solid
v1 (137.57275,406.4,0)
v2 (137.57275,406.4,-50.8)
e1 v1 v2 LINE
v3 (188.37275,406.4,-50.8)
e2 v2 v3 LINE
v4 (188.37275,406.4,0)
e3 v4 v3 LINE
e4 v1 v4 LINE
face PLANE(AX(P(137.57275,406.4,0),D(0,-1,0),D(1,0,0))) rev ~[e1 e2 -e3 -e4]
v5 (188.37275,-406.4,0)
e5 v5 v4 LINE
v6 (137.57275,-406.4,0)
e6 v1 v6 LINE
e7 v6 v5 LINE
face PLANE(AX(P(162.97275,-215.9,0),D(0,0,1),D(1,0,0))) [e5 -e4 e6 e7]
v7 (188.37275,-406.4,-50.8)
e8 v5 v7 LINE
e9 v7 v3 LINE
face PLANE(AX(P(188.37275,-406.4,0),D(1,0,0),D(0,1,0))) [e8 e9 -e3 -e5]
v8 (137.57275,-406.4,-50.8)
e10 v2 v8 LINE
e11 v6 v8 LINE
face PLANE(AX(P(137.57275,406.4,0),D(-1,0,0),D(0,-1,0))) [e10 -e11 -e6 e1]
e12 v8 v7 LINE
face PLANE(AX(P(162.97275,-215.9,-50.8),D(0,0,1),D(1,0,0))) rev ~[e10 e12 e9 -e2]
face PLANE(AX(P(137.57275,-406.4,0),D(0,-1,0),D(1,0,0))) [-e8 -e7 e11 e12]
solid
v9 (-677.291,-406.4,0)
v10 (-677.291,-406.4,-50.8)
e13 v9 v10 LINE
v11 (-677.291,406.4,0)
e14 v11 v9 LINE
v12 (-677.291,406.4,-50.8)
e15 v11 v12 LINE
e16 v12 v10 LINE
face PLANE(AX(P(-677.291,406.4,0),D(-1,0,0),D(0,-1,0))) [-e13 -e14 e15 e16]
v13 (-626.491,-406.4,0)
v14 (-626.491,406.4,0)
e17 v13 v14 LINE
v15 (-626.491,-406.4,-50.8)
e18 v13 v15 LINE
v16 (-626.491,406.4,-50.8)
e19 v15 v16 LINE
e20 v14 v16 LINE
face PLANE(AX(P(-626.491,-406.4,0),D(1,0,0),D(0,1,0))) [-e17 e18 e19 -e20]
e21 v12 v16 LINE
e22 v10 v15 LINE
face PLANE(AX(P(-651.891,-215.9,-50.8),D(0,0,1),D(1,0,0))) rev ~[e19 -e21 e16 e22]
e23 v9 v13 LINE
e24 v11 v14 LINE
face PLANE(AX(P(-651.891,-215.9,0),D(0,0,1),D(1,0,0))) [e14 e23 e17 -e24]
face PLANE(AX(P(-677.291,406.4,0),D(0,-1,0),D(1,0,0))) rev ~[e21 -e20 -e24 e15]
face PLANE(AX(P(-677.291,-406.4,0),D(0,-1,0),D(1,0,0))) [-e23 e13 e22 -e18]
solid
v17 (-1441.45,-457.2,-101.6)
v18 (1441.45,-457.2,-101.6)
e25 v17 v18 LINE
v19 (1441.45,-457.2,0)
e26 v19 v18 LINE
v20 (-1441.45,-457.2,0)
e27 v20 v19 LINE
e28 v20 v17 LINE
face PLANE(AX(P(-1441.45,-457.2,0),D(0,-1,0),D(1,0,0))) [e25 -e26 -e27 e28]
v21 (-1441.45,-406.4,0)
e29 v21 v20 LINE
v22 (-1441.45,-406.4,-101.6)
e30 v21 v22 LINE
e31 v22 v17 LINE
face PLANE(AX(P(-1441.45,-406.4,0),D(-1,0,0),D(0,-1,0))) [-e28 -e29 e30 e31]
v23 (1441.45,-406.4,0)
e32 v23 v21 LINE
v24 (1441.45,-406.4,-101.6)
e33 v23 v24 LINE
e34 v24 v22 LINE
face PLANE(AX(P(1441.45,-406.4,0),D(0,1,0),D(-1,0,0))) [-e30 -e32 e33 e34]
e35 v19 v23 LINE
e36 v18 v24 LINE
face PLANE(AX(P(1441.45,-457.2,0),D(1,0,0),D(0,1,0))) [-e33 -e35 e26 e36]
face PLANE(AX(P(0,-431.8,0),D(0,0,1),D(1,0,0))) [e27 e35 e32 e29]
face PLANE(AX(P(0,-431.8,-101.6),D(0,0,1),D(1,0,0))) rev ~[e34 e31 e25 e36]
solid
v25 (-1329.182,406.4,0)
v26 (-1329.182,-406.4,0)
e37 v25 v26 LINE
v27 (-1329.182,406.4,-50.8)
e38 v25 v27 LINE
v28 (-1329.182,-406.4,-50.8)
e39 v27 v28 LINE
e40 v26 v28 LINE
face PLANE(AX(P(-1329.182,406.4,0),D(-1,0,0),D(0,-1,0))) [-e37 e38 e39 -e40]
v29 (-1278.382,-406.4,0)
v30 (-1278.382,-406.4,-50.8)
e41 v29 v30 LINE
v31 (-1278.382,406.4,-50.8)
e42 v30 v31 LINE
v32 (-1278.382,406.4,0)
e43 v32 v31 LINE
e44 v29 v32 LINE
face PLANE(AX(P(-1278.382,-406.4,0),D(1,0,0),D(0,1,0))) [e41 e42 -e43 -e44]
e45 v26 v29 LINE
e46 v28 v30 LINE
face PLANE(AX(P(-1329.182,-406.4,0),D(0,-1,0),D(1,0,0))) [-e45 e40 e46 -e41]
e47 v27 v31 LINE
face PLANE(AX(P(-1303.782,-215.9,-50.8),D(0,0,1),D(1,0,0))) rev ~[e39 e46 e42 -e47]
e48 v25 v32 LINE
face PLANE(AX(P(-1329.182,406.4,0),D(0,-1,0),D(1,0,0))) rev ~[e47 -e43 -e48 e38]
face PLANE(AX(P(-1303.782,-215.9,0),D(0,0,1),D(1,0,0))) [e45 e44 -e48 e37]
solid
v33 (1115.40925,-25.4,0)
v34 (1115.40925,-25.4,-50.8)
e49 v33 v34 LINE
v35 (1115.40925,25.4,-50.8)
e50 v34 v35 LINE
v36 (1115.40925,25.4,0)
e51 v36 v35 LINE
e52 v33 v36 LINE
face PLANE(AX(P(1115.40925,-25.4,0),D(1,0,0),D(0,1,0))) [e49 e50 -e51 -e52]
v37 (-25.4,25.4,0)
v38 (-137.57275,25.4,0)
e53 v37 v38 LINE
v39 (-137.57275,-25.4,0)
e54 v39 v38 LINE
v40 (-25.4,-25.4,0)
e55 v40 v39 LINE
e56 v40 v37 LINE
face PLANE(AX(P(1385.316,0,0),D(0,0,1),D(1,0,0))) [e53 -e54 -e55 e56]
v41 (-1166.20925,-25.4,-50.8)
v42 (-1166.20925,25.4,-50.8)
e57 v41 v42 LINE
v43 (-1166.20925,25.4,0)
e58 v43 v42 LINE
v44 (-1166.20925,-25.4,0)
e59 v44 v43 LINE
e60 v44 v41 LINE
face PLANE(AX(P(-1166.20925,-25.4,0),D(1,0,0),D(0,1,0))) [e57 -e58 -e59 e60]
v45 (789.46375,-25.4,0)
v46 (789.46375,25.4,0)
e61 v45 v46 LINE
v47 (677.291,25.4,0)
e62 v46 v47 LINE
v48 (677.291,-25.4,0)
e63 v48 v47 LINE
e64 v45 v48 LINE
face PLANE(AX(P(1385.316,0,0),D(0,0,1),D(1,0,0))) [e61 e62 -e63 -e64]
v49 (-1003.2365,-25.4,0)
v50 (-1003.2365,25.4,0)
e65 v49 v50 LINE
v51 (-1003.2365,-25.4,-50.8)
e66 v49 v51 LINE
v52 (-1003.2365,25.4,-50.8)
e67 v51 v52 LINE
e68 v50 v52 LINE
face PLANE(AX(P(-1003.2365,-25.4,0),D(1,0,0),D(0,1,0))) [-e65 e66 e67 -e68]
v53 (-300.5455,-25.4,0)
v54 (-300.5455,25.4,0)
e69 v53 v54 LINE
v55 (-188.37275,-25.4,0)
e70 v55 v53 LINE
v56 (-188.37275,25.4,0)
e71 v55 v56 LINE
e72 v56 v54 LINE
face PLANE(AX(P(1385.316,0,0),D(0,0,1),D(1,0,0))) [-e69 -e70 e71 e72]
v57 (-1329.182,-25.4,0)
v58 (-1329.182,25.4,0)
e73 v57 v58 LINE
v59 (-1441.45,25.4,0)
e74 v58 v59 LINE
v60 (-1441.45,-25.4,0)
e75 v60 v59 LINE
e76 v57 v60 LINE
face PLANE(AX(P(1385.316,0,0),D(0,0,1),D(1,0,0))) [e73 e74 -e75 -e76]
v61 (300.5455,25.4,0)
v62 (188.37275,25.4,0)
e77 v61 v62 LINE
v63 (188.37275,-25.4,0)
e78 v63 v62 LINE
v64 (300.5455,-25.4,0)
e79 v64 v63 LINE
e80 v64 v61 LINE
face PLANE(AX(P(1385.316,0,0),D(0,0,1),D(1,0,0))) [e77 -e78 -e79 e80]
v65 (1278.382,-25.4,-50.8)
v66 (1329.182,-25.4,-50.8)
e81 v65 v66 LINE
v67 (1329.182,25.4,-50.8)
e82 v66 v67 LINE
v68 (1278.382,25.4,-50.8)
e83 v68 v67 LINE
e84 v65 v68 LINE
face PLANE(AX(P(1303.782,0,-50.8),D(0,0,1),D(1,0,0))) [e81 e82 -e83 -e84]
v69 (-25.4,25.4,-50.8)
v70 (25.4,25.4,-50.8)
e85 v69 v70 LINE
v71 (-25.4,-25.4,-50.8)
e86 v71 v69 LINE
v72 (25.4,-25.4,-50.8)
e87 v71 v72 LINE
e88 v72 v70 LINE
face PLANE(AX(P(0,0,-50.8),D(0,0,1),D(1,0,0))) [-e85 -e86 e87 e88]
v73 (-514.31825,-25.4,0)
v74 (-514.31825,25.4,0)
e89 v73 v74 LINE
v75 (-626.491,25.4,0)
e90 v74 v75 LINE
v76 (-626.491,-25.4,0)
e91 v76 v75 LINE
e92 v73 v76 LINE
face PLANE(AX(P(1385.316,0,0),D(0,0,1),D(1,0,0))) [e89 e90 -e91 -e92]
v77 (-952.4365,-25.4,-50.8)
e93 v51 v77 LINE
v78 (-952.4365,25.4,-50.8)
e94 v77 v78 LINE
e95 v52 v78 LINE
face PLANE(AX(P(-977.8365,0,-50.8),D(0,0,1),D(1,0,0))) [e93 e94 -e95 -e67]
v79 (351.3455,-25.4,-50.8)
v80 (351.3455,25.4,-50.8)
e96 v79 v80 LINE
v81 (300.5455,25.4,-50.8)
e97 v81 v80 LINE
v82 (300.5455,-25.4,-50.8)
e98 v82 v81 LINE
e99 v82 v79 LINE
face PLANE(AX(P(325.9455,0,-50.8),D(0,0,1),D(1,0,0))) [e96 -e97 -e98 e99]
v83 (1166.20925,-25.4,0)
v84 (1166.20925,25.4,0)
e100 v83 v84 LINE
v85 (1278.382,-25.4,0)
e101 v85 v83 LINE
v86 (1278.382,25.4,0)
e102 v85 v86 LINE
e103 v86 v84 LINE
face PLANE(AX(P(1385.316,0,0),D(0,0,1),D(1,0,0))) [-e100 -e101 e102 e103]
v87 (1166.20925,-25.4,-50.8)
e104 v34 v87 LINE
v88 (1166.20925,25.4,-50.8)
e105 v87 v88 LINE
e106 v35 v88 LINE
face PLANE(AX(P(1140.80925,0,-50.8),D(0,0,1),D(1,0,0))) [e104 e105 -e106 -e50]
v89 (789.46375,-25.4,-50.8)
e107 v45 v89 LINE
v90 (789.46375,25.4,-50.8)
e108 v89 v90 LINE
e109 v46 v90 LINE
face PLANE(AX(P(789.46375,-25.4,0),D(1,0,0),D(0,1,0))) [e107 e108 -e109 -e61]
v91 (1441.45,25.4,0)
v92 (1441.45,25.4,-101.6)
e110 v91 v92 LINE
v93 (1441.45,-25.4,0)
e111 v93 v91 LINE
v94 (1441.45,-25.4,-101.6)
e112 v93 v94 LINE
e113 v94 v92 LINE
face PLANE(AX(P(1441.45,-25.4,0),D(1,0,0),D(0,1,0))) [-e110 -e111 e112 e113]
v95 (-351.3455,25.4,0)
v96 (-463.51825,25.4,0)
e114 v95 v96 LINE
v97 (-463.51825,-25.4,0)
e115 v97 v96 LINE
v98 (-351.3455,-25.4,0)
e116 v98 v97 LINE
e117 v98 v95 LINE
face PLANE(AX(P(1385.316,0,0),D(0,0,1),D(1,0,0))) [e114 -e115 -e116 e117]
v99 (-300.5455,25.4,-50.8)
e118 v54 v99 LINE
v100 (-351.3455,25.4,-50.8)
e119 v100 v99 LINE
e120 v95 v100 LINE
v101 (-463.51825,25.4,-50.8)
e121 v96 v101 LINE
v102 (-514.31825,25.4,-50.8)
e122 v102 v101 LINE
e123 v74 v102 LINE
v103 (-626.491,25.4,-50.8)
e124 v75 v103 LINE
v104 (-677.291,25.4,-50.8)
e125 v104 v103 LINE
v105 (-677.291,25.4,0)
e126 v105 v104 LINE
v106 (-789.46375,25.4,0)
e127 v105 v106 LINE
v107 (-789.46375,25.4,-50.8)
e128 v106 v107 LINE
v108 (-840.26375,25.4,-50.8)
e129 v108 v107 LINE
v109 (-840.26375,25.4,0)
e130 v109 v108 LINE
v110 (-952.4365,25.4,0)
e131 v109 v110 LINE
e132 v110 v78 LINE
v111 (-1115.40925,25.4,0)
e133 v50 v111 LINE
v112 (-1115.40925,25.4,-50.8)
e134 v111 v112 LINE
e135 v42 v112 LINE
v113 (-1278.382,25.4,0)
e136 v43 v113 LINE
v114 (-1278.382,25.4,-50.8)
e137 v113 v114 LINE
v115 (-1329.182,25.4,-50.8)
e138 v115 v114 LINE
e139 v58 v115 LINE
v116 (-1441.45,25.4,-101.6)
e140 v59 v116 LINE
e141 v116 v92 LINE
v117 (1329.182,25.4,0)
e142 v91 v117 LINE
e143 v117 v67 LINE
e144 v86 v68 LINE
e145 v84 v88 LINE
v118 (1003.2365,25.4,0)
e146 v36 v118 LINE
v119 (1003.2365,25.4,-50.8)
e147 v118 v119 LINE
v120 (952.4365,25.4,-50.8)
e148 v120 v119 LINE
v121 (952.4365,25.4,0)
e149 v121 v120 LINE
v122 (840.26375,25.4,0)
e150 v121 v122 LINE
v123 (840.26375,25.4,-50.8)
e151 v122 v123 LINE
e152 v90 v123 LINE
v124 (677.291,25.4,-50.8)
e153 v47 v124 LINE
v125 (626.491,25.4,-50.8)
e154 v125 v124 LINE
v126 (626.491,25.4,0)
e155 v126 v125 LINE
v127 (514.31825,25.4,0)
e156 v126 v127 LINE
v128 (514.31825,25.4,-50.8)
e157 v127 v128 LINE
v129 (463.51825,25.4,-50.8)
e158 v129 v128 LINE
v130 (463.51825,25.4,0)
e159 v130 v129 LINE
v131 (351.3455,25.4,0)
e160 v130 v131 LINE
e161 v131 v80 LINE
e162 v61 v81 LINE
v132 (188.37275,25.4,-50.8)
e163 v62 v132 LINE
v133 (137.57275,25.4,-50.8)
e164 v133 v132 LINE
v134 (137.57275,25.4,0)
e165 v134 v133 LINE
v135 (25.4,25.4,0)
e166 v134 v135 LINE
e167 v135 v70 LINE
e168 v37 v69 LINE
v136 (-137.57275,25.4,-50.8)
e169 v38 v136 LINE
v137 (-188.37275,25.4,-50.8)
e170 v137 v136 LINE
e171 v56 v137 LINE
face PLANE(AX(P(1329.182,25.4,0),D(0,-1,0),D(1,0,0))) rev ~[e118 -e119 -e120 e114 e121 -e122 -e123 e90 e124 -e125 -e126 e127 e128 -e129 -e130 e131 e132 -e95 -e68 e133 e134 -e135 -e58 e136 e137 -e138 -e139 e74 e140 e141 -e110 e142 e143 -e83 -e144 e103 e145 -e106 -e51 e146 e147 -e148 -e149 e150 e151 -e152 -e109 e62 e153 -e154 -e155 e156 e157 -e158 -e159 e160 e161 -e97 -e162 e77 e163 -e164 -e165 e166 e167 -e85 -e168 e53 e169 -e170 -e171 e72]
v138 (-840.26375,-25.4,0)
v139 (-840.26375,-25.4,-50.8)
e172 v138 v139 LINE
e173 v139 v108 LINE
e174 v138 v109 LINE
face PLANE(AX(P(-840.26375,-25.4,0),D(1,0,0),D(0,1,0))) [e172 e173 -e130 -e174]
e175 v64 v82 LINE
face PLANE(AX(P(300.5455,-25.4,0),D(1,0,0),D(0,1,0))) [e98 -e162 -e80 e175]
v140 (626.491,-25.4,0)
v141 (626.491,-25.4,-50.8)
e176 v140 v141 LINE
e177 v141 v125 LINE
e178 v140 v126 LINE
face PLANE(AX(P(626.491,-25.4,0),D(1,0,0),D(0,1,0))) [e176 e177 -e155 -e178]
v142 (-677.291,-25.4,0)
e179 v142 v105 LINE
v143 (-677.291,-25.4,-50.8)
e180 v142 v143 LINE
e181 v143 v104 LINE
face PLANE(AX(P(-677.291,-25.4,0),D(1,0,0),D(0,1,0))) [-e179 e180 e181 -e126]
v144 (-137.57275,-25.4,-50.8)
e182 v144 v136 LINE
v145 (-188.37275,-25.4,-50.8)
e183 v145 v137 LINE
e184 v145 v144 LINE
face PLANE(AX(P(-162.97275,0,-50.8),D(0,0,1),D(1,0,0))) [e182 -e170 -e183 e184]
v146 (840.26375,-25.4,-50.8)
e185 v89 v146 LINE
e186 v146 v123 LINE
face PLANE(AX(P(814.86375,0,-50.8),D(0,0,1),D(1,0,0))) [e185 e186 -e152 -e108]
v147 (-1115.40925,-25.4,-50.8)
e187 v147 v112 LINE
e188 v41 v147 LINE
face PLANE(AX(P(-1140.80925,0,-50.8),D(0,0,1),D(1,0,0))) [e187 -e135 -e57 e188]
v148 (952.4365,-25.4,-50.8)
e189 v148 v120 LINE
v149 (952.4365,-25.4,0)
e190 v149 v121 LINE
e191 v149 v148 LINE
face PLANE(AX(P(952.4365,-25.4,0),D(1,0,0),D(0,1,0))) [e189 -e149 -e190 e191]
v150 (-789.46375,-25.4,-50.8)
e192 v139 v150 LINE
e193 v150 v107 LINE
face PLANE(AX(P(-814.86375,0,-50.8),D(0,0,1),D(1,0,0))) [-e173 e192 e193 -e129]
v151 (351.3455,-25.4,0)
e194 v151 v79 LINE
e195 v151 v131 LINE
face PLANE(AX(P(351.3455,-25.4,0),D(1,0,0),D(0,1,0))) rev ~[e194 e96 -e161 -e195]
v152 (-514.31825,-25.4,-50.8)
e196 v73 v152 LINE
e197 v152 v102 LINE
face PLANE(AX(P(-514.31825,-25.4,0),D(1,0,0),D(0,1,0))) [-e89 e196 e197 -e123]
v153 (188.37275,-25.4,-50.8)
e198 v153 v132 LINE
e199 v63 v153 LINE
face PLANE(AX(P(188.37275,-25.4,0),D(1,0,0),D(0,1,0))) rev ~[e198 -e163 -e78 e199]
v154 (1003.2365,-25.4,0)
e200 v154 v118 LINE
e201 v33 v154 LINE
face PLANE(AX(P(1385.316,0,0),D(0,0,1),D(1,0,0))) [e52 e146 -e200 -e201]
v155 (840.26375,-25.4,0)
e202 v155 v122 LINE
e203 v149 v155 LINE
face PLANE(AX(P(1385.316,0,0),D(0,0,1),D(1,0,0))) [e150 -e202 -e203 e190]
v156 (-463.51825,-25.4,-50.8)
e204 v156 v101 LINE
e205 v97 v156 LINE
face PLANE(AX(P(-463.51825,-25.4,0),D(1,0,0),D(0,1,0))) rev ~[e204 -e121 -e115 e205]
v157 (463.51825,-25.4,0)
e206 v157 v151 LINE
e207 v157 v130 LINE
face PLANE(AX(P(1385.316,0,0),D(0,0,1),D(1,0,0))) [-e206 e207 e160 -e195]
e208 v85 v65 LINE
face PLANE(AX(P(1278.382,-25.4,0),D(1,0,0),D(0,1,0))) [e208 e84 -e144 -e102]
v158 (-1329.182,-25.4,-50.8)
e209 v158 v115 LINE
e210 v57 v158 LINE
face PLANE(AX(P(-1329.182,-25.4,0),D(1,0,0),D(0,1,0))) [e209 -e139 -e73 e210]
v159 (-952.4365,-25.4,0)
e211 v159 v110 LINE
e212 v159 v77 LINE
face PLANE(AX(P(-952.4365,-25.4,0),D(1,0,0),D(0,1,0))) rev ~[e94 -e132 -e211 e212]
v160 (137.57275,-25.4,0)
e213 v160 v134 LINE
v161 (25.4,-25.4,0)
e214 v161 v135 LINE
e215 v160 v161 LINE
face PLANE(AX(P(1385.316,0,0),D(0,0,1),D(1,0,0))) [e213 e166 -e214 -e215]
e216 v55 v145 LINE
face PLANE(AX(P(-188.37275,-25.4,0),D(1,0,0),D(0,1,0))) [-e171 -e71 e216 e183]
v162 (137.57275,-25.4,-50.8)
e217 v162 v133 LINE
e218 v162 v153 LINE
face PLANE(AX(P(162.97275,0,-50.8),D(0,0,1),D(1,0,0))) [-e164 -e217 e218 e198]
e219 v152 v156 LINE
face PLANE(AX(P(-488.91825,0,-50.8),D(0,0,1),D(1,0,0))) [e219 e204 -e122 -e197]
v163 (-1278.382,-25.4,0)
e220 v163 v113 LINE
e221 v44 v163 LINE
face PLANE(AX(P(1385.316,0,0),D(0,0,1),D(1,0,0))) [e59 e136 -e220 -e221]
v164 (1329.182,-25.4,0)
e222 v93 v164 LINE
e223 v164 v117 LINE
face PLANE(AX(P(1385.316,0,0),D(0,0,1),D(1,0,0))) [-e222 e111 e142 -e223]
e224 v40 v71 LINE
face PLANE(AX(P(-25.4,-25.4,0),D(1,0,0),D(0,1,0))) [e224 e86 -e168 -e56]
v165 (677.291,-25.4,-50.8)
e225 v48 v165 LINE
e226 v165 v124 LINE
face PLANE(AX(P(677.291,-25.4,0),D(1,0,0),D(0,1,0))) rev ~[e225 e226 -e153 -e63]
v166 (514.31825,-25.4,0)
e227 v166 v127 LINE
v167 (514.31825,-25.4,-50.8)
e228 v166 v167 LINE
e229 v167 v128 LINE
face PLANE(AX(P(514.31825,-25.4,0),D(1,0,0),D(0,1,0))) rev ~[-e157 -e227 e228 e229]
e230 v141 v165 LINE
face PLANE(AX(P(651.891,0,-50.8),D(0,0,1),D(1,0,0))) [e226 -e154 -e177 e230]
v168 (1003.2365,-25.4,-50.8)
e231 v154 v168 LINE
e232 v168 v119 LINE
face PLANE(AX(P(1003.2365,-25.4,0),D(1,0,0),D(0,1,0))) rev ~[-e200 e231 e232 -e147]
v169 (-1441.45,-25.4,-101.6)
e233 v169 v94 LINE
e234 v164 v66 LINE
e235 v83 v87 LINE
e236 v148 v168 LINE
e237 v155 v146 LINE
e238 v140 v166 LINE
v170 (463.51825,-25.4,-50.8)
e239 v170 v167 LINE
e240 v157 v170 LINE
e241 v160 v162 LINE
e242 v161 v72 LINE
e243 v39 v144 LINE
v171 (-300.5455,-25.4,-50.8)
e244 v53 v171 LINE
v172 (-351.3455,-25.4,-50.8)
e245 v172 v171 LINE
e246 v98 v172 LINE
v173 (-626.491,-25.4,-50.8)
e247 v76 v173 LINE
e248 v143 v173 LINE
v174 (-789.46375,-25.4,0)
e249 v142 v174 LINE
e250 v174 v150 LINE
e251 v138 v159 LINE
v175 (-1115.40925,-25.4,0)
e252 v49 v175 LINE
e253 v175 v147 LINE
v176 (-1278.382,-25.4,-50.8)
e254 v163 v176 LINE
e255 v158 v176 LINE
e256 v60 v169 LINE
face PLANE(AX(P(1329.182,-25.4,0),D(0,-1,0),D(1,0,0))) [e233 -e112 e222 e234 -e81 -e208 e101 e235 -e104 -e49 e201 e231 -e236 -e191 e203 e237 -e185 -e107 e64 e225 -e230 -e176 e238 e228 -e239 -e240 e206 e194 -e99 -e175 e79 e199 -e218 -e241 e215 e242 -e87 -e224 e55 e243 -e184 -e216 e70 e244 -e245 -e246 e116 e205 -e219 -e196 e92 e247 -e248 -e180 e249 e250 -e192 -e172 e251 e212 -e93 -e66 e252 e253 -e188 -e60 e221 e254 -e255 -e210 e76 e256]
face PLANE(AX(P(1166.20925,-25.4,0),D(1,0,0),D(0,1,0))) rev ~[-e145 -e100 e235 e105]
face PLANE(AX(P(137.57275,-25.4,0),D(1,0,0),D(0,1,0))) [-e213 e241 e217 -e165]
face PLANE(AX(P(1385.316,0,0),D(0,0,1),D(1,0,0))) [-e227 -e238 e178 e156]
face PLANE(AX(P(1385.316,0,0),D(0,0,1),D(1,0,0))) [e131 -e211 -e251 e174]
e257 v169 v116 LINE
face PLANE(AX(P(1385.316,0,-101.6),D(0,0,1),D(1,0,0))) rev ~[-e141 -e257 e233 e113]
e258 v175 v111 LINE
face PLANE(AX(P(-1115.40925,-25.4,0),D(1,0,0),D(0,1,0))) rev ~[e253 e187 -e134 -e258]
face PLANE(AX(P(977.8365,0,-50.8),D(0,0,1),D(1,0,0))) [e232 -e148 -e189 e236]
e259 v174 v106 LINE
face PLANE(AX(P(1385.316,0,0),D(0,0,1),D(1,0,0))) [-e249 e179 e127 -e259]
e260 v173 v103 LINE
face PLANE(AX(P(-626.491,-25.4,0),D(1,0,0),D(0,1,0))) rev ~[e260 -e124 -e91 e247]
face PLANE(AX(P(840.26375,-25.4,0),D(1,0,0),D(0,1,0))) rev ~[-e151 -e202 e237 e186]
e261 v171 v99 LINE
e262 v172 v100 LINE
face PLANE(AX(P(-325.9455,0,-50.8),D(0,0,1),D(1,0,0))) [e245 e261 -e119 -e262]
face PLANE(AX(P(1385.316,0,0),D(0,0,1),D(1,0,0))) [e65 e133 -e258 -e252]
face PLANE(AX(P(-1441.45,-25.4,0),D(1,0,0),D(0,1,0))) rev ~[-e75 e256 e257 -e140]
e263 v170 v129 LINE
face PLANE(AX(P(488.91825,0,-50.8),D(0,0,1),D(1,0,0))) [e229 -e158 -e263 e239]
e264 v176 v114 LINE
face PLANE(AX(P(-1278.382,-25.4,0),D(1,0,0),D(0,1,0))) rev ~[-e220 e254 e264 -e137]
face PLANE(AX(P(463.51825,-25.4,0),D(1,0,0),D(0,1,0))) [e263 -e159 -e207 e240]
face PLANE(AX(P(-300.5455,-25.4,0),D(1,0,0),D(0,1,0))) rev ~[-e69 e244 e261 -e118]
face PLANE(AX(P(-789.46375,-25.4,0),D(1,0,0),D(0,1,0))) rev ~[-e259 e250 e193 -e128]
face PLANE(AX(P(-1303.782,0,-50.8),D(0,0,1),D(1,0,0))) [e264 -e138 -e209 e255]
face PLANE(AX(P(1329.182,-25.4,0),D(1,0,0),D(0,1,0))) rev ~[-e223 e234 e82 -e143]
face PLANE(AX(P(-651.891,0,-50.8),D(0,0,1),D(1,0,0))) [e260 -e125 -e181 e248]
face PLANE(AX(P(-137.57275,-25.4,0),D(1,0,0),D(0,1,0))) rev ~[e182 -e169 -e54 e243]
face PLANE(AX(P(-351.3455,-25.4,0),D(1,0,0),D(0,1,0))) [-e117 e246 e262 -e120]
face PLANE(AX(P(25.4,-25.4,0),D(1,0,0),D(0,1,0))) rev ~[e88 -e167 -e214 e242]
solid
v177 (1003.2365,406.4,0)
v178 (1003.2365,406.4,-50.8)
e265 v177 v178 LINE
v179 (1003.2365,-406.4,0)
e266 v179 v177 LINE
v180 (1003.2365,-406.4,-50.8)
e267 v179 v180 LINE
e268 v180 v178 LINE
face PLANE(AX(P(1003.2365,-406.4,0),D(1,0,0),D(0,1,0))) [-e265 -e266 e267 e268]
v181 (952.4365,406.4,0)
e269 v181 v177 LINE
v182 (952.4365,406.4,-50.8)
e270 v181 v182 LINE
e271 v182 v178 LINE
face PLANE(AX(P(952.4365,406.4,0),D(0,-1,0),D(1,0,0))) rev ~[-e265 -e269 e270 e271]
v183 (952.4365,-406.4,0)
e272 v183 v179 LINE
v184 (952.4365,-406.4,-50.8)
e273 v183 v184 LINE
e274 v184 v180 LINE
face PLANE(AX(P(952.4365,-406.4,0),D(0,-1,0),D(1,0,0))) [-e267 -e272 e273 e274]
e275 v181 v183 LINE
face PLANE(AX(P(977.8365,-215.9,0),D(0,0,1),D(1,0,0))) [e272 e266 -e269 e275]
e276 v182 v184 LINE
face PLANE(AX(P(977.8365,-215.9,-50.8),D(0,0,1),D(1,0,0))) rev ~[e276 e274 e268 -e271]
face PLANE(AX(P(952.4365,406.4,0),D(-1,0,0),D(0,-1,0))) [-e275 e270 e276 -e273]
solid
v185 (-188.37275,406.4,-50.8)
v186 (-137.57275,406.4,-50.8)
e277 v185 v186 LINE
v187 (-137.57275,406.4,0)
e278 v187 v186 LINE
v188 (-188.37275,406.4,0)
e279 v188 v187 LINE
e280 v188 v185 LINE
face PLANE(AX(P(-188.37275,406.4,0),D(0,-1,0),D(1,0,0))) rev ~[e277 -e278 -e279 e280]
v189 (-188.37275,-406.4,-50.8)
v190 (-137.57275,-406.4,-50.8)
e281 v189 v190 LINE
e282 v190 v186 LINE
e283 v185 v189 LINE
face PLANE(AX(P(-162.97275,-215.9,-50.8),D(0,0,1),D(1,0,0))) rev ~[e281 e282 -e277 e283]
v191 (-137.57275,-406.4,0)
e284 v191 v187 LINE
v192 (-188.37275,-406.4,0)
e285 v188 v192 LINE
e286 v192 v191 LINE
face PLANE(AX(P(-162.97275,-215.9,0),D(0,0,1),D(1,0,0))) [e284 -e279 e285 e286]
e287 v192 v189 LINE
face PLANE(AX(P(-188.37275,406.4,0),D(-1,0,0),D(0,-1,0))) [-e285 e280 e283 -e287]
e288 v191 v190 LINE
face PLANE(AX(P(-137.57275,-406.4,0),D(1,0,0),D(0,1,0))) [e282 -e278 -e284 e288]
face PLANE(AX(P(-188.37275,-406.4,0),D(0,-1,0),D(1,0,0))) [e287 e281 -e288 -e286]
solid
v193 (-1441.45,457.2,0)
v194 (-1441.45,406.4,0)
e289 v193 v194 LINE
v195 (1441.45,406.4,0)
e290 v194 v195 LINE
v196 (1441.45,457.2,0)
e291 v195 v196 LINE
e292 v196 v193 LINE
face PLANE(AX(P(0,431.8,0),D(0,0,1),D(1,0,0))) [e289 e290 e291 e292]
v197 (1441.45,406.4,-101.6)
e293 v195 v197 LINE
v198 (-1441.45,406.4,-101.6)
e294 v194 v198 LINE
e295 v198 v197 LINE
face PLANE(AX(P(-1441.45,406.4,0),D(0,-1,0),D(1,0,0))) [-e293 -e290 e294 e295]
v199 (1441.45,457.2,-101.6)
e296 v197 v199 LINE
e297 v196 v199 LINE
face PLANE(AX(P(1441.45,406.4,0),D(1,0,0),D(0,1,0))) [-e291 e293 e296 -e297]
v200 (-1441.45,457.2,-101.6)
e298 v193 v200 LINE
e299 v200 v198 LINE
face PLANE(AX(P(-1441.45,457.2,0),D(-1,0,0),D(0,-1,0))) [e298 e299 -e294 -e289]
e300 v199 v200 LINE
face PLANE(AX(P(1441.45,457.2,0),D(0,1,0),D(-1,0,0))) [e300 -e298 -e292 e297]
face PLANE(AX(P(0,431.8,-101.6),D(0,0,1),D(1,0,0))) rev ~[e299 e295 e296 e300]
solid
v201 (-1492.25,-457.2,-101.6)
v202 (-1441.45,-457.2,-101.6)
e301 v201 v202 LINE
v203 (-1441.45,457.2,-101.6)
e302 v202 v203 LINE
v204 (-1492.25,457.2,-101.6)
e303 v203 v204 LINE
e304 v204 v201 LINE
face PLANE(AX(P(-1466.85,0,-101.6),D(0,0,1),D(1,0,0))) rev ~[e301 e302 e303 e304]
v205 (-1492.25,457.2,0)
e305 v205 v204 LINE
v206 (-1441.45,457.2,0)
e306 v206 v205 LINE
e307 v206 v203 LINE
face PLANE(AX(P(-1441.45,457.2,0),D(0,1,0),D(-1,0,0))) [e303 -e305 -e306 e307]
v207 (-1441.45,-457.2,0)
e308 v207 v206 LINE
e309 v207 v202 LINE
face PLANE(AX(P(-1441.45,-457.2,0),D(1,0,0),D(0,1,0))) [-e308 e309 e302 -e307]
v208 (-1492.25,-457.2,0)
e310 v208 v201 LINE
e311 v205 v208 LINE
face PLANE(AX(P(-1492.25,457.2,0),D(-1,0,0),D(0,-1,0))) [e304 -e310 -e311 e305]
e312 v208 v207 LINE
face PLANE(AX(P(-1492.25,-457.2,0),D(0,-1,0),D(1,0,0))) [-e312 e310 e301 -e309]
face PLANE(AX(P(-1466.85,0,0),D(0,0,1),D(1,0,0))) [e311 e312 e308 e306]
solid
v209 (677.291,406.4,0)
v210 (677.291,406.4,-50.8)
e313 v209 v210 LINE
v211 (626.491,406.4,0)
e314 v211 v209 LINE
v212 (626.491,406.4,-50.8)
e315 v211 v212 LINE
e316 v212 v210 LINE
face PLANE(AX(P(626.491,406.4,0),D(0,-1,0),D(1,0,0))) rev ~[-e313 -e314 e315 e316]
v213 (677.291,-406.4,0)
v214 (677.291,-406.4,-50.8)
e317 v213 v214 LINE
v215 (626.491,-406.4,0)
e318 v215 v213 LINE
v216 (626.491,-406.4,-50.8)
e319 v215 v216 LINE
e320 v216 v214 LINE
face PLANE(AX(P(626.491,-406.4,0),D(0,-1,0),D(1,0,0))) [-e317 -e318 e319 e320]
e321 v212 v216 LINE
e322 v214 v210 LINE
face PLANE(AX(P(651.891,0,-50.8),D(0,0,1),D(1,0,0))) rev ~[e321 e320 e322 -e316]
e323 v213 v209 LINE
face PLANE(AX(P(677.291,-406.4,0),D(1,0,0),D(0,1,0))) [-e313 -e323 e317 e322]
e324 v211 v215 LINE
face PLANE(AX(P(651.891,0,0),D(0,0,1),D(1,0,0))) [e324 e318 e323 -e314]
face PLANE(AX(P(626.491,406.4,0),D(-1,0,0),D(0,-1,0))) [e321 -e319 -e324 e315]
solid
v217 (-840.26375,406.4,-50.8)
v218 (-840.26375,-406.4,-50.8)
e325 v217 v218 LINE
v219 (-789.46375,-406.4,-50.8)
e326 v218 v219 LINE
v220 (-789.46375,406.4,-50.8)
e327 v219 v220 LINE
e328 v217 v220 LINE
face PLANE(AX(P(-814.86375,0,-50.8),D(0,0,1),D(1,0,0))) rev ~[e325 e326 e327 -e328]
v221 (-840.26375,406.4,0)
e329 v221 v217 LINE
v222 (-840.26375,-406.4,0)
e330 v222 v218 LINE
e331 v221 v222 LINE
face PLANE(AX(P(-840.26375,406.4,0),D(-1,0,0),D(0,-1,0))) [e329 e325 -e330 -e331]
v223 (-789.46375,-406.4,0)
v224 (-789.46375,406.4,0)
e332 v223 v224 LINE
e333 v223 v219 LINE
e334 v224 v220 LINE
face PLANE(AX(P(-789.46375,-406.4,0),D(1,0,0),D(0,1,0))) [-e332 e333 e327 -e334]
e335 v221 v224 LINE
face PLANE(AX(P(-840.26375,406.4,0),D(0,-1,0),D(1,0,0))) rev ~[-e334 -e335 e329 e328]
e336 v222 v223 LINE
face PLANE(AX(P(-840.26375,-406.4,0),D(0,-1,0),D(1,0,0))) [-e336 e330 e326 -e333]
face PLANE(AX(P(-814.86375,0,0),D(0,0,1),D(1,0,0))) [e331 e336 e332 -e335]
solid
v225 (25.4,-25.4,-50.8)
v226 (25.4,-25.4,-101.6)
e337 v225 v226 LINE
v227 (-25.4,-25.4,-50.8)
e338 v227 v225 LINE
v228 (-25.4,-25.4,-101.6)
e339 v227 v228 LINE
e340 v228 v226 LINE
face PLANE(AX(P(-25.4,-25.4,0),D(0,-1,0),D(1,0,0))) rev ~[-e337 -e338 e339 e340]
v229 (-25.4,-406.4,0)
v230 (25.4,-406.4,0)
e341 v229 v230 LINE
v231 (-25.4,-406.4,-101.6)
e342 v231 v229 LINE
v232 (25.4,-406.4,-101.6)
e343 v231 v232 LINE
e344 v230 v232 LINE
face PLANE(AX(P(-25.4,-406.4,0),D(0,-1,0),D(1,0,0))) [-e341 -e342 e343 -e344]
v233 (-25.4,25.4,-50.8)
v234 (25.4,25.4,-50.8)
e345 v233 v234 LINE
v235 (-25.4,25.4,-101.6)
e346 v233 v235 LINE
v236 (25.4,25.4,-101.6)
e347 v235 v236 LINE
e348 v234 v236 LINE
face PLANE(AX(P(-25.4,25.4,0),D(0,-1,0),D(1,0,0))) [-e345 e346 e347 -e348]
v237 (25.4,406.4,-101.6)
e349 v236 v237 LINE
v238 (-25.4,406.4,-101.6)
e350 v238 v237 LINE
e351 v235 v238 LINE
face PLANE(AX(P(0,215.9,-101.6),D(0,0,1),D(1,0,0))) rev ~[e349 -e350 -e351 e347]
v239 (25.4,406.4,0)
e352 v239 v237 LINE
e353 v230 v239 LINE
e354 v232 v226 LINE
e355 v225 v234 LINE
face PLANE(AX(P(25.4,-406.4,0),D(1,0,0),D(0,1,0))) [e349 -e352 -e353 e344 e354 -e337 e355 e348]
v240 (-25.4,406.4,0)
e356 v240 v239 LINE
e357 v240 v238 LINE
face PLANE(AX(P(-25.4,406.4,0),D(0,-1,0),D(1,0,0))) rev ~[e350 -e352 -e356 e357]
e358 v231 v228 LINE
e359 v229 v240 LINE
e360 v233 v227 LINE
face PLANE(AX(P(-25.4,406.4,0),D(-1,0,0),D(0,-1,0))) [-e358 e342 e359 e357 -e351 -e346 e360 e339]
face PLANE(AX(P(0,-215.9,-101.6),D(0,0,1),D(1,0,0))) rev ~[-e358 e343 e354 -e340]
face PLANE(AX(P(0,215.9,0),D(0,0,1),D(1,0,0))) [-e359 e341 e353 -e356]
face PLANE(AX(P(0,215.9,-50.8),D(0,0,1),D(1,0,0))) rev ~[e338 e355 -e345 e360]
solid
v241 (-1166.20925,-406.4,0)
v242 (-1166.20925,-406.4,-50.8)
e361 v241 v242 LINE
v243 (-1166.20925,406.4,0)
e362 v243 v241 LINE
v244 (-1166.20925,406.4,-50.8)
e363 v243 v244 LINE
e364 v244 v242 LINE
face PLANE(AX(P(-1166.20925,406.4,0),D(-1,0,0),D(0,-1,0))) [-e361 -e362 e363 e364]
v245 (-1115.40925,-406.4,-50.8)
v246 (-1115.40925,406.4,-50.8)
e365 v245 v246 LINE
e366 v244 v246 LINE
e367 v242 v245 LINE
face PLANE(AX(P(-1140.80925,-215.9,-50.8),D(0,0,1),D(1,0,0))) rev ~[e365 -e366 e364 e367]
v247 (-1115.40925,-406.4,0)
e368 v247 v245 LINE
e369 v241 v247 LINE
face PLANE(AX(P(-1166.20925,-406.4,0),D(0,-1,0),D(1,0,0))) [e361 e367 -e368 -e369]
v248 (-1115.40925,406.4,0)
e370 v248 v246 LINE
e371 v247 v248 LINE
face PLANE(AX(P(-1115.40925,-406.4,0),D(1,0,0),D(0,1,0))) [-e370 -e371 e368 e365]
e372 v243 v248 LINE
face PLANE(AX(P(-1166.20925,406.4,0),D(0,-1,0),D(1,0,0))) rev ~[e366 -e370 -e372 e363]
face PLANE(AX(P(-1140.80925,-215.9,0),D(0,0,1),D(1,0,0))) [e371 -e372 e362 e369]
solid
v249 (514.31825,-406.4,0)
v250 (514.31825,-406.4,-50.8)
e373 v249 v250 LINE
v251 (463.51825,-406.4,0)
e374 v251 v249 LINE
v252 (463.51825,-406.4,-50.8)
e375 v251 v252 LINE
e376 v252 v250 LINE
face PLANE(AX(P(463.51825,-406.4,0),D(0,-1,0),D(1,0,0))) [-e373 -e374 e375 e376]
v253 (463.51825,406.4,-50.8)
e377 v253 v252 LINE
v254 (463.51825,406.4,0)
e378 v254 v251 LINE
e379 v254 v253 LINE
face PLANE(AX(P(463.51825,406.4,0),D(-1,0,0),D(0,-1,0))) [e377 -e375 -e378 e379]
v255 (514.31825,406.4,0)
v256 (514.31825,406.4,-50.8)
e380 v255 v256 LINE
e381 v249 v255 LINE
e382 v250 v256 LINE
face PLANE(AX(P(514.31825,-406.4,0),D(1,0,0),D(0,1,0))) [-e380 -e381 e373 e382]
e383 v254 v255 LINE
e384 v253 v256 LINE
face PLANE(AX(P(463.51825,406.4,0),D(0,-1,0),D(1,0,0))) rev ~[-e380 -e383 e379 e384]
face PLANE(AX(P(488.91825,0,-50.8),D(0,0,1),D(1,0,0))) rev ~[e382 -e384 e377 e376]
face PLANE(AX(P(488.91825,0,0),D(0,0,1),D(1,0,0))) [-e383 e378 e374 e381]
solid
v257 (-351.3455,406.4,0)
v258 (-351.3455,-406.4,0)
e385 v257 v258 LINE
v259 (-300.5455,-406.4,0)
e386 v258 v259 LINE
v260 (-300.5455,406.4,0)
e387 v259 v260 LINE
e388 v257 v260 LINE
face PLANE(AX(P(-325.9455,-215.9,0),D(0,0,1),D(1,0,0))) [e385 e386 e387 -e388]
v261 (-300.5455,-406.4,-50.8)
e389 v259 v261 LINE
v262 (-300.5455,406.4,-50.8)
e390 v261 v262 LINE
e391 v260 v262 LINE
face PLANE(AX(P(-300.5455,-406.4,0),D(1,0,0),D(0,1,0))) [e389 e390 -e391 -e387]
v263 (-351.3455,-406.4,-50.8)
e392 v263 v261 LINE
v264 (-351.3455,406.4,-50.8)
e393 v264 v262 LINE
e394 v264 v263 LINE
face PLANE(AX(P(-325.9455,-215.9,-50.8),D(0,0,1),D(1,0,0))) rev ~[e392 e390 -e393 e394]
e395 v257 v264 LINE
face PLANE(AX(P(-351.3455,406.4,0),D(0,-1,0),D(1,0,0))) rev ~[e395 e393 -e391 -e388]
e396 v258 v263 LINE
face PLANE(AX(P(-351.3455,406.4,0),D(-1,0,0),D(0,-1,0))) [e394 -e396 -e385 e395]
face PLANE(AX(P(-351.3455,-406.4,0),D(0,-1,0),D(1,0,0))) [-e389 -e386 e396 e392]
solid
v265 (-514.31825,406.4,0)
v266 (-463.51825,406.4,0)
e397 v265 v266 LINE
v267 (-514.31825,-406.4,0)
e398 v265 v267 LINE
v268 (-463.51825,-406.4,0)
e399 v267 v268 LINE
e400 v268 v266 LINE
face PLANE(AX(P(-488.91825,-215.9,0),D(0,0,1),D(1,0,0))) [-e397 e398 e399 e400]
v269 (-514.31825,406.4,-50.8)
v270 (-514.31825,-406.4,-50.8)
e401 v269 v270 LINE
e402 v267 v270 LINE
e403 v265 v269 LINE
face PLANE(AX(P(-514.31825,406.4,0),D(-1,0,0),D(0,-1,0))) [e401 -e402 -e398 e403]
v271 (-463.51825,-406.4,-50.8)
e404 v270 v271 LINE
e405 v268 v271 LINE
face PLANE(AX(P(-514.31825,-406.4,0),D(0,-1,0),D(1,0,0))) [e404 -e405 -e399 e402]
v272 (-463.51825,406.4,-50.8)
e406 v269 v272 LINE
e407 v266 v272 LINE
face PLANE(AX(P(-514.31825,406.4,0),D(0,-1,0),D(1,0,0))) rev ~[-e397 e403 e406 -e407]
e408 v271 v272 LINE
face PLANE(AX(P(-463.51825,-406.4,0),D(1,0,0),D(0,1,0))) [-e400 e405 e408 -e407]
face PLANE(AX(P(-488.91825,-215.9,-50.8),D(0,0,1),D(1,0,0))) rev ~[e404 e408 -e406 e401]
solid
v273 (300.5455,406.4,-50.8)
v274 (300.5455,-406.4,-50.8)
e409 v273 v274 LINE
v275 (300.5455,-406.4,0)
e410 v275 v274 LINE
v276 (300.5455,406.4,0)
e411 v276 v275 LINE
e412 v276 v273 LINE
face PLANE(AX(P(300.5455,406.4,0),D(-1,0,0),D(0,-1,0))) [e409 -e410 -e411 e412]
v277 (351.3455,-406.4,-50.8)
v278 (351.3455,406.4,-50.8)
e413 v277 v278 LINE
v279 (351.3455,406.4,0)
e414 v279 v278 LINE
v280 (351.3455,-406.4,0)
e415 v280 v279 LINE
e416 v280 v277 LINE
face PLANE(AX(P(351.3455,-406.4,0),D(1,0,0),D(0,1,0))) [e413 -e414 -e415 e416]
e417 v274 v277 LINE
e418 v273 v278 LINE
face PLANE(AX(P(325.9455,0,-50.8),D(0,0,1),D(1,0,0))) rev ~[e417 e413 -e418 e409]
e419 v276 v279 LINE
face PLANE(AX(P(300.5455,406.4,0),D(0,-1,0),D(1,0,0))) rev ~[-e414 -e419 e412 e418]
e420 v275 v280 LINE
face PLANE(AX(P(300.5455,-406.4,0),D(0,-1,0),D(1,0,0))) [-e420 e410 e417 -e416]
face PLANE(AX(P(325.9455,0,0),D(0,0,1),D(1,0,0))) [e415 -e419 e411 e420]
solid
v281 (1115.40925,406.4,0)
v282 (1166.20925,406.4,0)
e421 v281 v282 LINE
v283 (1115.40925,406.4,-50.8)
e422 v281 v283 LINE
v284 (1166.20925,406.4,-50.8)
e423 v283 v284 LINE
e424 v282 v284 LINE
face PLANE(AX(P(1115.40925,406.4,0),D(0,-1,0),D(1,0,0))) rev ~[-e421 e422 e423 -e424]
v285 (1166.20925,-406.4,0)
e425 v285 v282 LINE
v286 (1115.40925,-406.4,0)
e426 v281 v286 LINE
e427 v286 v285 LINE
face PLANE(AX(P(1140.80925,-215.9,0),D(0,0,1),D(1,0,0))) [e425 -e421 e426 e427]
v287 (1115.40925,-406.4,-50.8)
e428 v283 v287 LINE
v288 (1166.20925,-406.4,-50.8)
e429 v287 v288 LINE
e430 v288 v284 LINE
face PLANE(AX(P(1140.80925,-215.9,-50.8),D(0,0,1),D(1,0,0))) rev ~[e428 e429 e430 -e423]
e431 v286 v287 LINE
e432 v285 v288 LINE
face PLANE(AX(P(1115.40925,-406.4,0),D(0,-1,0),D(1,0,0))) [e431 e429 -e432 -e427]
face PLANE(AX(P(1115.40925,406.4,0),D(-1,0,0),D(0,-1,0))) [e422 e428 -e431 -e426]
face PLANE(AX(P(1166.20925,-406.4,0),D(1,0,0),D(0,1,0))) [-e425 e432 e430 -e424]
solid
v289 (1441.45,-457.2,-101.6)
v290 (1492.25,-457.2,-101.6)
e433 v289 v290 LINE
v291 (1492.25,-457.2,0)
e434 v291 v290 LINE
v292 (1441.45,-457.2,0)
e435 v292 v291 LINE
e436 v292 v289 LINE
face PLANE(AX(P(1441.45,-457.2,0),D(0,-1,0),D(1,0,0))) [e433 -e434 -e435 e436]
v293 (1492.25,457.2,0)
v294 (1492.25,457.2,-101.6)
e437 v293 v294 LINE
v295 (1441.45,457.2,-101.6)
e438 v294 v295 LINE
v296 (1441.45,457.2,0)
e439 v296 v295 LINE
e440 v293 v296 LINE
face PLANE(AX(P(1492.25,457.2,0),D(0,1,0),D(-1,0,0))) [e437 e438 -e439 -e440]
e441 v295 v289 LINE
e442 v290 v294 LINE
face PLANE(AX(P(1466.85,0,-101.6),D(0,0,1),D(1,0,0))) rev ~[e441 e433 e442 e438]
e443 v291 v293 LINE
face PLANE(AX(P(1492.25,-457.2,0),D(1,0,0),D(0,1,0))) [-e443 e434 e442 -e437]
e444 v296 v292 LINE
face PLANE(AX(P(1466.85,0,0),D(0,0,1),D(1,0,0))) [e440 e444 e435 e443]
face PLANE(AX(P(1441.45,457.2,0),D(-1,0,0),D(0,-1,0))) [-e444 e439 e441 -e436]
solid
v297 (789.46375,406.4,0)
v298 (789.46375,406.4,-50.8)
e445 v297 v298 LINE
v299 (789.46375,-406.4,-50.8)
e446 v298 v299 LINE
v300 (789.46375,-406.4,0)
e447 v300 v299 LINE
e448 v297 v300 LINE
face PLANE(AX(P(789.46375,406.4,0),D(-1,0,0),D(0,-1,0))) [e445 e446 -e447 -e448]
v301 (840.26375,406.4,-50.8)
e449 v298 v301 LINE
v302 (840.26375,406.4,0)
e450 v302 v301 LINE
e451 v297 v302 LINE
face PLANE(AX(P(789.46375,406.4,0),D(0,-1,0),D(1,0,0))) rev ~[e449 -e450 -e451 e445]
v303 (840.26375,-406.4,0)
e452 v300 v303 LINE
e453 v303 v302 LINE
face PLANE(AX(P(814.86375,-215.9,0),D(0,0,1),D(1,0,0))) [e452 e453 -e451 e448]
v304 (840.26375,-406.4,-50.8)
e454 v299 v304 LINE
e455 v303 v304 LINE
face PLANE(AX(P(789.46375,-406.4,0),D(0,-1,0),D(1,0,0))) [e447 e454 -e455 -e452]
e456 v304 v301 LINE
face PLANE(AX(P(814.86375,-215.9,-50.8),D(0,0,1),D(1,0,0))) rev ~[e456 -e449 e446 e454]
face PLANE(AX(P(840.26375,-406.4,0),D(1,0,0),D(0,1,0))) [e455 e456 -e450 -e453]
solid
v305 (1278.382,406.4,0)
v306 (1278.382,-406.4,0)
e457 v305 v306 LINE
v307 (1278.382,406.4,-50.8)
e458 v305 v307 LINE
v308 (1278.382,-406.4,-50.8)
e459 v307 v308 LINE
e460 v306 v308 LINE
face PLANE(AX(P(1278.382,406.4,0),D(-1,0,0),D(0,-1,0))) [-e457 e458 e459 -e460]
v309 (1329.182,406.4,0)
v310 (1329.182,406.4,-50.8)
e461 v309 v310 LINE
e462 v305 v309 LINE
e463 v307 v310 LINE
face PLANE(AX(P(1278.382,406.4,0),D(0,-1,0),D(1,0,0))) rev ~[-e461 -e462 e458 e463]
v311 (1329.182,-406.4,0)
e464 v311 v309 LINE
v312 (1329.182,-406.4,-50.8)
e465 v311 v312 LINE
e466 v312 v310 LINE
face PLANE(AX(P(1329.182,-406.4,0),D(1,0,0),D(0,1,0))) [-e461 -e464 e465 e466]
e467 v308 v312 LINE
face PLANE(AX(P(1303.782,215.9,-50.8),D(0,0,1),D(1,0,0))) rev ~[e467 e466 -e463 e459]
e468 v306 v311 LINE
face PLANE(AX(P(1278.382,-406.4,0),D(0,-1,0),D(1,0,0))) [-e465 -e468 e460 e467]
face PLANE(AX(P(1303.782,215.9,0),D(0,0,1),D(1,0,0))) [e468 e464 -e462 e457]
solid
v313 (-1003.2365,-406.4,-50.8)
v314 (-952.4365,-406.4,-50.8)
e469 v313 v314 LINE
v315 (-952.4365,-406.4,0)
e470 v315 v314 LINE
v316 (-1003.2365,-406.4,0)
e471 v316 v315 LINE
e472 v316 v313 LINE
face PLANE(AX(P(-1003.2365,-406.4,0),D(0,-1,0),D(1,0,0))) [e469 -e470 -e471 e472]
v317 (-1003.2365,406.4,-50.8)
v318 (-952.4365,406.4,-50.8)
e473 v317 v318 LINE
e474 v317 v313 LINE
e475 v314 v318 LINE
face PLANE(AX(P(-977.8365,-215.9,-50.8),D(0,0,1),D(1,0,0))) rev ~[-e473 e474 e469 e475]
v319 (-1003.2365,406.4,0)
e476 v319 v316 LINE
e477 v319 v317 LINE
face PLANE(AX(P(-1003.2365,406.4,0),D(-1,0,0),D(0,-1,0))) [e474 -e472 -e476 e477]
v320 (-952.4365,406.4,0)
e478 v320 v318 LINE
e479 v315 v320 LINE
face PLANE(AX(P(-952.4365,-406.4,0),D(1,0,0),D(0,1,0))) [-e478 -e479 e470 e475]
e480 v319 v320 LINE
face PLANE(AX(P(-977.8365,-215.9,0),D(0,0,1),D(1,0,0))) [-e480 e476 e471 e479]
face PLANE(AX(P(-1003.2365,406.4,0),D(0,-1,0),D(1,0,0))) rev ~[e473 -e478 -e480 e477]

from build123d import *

# Parameters (mm, degrees)
F0_W     = 50.8
F0_H     = 381
F0_H_2   = 50.8
F1_DEPTH = 50.8
F0_W_2   = 112.17275
F2_DEPTH = 101.6
F3_DEPTH = 101.6
F0_W_3   = 112.268
F4_DEPTH = 101.6
F5_DEPTH = 50.8


# Not quite as in the source:
# - a feature names something its author has since deleted; it is built from what else it names


with BuildPart() as f1:
    # F0 (on Top) → F1 (new body)
    with BuildSketch(Plane.XY):
        with Locations((1303.782, 215.9)):
            Rectangle(F0_W, F0_H)
        with Locations((1303.782, -215.9)):
            Rectangle(F0_W, F0_H)
        with Locations((1303.782, 0)):
            Rectangle(F0_W, F0_H_2)
    extrude(amount=-F1_DEPTH)


with BuildPart() as f1b:
    # F0 (on Top) → F1, piece 2 (new body)
    with BuildSketch(Plane.XY):
        with Locations((1140.80925, -215.9)):
            Rectangle(F0_W, F0_H)
        with Locations((1140.80925, 0)):
            Rectangle(F0_W, F0_H_2)
        with Locations((1140.80925, 215.9)):
            Rectangle(F0_W, F0_H)
    extrude(amount=-F1_DEPTH)


with BuildPart() as f1c:
    # F0 (on Top) → F1, piece 3 (new body)
    with BuildSketch(Plane.XY):
        with Locations((977.8365, -215.9)):
            Rectangle(F0_W, F0_H)
        with Locations((977.8365, 0)):
            Rectangle(F0_W, F0_H_2)
        with Locations((977.8365, 215.9)):
            Rectangle(F0_W, F0_H)
    extrude(amount=-F1_DEPTH)


with BuildPart() as f1d:
    # F0 (on Top) → F1, piece 4 (new body)
    with BuildSketch(Plane.XY):
        with Locations((651.891, 0)):
            Rectangle(F0_W, F0_H_2)
        with Locations((651.891, 215.9)):
            Rectangle(F0_W, F0_H)
        with Locations((651.891, -215.9)):
            Rectangle(F0_W, F0_H)
    extrude(amount=-F1_DEPTH)


with BuildPart() as f1e:
    # F0 (on Top) → F1, piece 5 (new body)
    with BuildSketch(Plane.XY):
        with Locations((488.91825, 0)):
            Rectangle(F0_W, F0_H_2)
        with Locations((488.91825, 215.9)):
            Rectangle(F0_W, F0_H)
        with Locations((488.91825, -215.9)):
            Rectangle(F0_W, F0_H)
    extrude(amount=-F1_DEPTH)


with BuildPart() as f1f:
    # F0 (on Top) → F1, piece 6 (new body)
    with BuildSketch(Plane.XY):
        with Locations((325.9455, 0)):
            Rectangle(F0_W, F0_H_2)
        with Locations((325.9455, -215.9)):
            Rectangle(F0_W, F0_H)
        with Locations((325.9455, 215.9)):
            Rectangle(F0_W, F0_H)
    extrude(amount=-F1_DEPTH)


with BuildPart() as f1g:
    # F0 (on Top) → F1, piece 7 (new body)
    with BuildSketch(Plane.XY):
        with Locations((162.97275, -215.9)):
            Rectangle(F0_W, F0_H)
        with Locations((162.97275, 215.9)):
            Rectangle(F0_W, F0_H)
        with Locations((162.97275, 0)):
            Rectangle(F0_W, F0_H_2)
    extrude(amount=-F1_DEPTH)


with BuildPart() as f1h:
    # F0 (on Top) → F1, piece 8 (new body)
    with BuildSketch(Plane.XY):
        with Locations((0, 215.9)):
            Rectangle(F0_W, F0_H)
        with Locations((0, -215.9)):
            Rectangle(F0_W, F0_H)
        Rectangle(F0_W, F0_H_2)
    extrude(amount=-F1_DEPTH)

    # F0 (on Top) → F2, piece 2 (join)
    with BuildSketch(Plane.XY):
        with Locations((0, 215.9)):
            Rectangle(F0_W, F0_H)
        with Locations((0, -215.9)):
            Rectangle(F0_W, F0_H)
    extrude(amount=-F2_DEPTH)


with BuildPart() as f1i:
    # F0 (on Top) → F1, piece 9 (new body)
    with BuildSketch(Plane.XY):
        with Locations((-162.97275, -215.9)):
            Rectangle(F0_W, F0_H)
        with Locations((-162.97275, 0)):
            Rectangle(F0_W, F0_H_2)
        with Locations((-162.97275, 215.9)):
            Rectangle(F0_W, F0_H)
    extrude(amount=-F1_DEPTH)


with BuildPart() as f1j:
    # F0 (on Top) → F1, piece 10 (new body)
    with BuildSketch(Plane.XY):
        with Locations((-488.91825, -215.9)):
            Rectangle(F0_W, F0_H)
        with Locations((-488.91825, 215.9)):
            Rectangle(F0_W, F0_H)
        with Locations((-488.91825, 0)):
            Rectangle(F0_W, F0_H_2)
    extrude(amount=-F1_DEPTH)


with BuildPart() as f1k:
    # F0 (on Top) → F1, piece 11 (new body)
    with BuildSketch(Plane.XY):
        with Locations((-814.86375, 0)):
            Rectangle(F0_W, F0_H_2)
        with Locations((-814.86375, -215.9)):
            Rectangle(F0_W, F0_H)
        with Locations((-814.86375, 215.9)):
            Rectangle(F0_W, F0_H)
    extrude(amount=-F1_DEPTH)


with BuildPart() as f1l:
    # F0 (on Top) → F1, piece 12 (new body)
    with BuildSketch(Plane.XY):
        with Locations((-977.8365, -215.9)):
            Rectangle(F0_W, F0_H)
        with Locations((-977.8365, 215.9)):
            Rectangle(F0_W, F0_H)
        with Locations((-977.8365, 0)):
            Rectangle(F0_W, F0_H_2)
    extrude(amount=-F1_DEPTH)


with BuildPart() as f1m:
    # F0 (on Top) → F1, piece 13 (new body)
    with BuildSketch(Plane.XY):
        with Locations((-1140.80925, -215.9)):
            Rectangle(F0_W, F0_H)
        with Locations((-1140.80925, 215.9)):
            Rectangle(F0_W, F0_H)
        with Locations((-1140.80925, 0)):
            Rectangle(F0_W, F0_H_2)
    extrude(amount=-F1_DEPTH)


with BuildPart() as f1n:
    # F0 (on Top) → F1, piece 14 (new body)
    with BuildSketch(Plane.XY):
        with Locations((-1303.782, -215.9)):
            Rectangle(F0_W, F0_H)
        with Locations((-1303.782, 0)):
            Rectangle(F0_W, F0_H_2)
        with Locations((-1303.782, 215.9)):
            Rectangle(F0_W, F0_H)
    extrude(amount=-F1_DEPTH)


with BuildPart() as f1o:
    # F0 (on Top) → F1, piece 15 (new body)
    with BuildSketch(Plane.XY):
        with Locations((-325.9455, -215.9)):
            Rectangle(F0_W, F0_H)
        with Locations((-325.9455, 0)):
            Rectangle(F0_W, F0_H_2)
        with Locations((-325.9455, 215.9)):
            Rectangle(F0_W, F0_H)
    extrude(amount=-F1_DEPTH)


with BuildPart() as f1p:
    # F0 (on Top) → F1, piece 16 (new body)
    with BuildSketch(Plane.XY):
        with Locations((-651.891, -215.9)):
            Rectangle(F0_W, F0_H)
        with Locations((-651.891, 215.9)):
            Rectangle(F0_W, F0_H)
        with Locations((-651.891, 0)):
            Rectangle(F0_W, F0_H_2)
    extrude(amount=-F1_DEPTH)


with BuildPart() as f1q:
    # F0 (on Top) → F1, piece 17 (new body)
    with BuildSketch(Plane.XY):
        with Locations((814.86375, -215.9)):
            Rectangle(F0_W, F0_H)
        with Locations((814.86375, 215.9)):
            Rectangle(F0_W, F0_H)
        with Locations((814.86375, 0)):
            Rectangle(F0_W, F0_H_2)
    extrude(amount=-F1_DEPTH)


with BuildPart() as f2:
    # F0 (on Top) → F2 (new body)
    with BuildSketch(Plane.XY):
        with Locations((1303.782, 0)):
            Rectangle(F0_W, F0_H_2)
        with Locations((1222.295625, 0)):
            Rectangle(F0_W_2, F0_H_2)
    extrude(amount=-F2_DEPTH)

    # F0 (on Top) → F4 (join)
    with BuildSketch(Plane.XY):
        with Locations((1385.316, 0)):
            Rectangle(F0_W_3, F0_H_2)
        with Locations((1140.80925, 0)):
            Rectangle(F0_W, F0_H_2)
        with Locations((977.8365, 0)):
            Rectangle(F0_W, F0_H_2)
        with Locations((1059.322875, 0)):
            Rectangle(F0_W_2, F0_H_2)
        with Locations((896.350125, 0)):
            Rectangle(F0_W_2, F0_H_2)
        with Locations((814.86375, 0)):
            Rectangle(F0_W, F0_H_2)
        with Locations((570.404625, 0)):
            Rectangle(F0_W_2, F0_H_2)
        with Locations((-325.9455, 0)):
            Rectangle(F0_W, F0_H_2)
        with Locations((325.9455, 0)):
            Rectangle(F0_W, F0_H_2)
        with Locations((407.431875, 0)):
            Rectangle(F0_W_2, F0_H_2)
        with Locations((651.891, 0)):
            Rectangle(F0_W, F0_H_2)
        with Locations((-244.459125, 0)):
            Rectangle(F0_W_2, F0_H_2)
        with Locations((-896.350125, 0)):
            Rectangle(F0_W_2, F0_H_2)
        with Locations((-977.8365, 0)):
            Rectangle(F0_W, F0_H_2)
        with Locations((-1222.295625, 0)):
            Rectangle(F0_W_2, F0_H_2)
        with Locations((-162.97275, 0)):
            Rectangle(F0_W, F0_H_2)
        with Locations((81.486375, 0)):
            Rectangle(F0_W_2, F0_H_2)
        with Locations((-81.486375, 0)):
            Rectangle(F0_W_2, F0_H_2)
        with Locations((-1059.322875, 0)):
            Rectangle(F0_W_2, F0_H_2)
        with Locations((244.459125, 0)):
            Rectangle(F0_W_2, F0_H_2)
        with Locations((-1385.316, 0)):
            Rectangle(F0_W_3, F0_H_2)
        with Locations((-1140.80925, 0)):
            Rectangle(F0_W, F0_H_2)
        with Locations((162.97275, 0)):
            Rectangle(F0_W, F0_H_2)
        with Locations((-814.86375, 0)):
            Rectangle(F0_W, F0_H_2)
        Rectangle(F0_W, F0_H_2)
        with Locations((-488.91825, 0)):
            Rectangle(F0_W, F0_H_2)
        with Locations((-407.431875, 0)):
            Rectangle(F0_W_2, F0_H_2)
        with Locations((733.377375, 0)):
            Rectangle(F0_W_2, F0_H_2)
        with Locations((-1303.782, 0)):
            Rectangle(F0_W, F0_H_2)
        with Locations((-570.404625, 0)):
            Rectangle(F0_W_2, F0_H_2)
        with Locations((-733.377375, 0)):
            Rectangle(F0_W_2, F0_H_2)
        with Locations((-651.891, 0)):
            Rectangle(F0_W, F0_H_2)
        with Locations((488.91825, 0)):
            Rectangle(F0_W, F0_H_2)
    extrude(amount=-F4_DEPTH)

    # F0 (on Top) → F5 (cut)
    with BuildSketch(Plane.XY):
        with Locations((1303.782, 0)):
            Rectangle(F0_W, F0_H_2)
        with Locations((1140.80925, 0)):
            Rectangle(F0_W, F0_H_2)
        with Locations((977.8365, 0)):
            Rectangle(F0_W, F0_H_2)
        with Locations((814.86375, 0)):
            Rectangle(F0_W, F0_H_2)
        with Locations((651.891, 0)):
            Rectangle(F0_W, F0_H_2)
        with Locations((488.91825, 0)):
            Rectangle(F0_W, F0_H_2)
        with Locations((325.9455, 0)):
            Rectangle(F0_W, F0_H_2)
        with Locations((162.97275, 0)):
            Rectangle(F0_W, F0_H_2)
        Rectangle(F0_W, F0_H_2)
        with Locations((-162.97275, 0)):
            Rectangle(F0_W, F0_H_2)
        with Locations((-325.9455, 0)):
            Rectangle(F0_W, F0_H_2)
        with Locations((-488.91825, 0)):
            Rectangle(F0_W, F0_H_2)
        with Locations((-651.891, 0)):
            Rectangle(F0_W, F0_H_2)
        with Locations((-814.86375, 0)):
            Rectangle(F0_W, F0_H_2)
        with Locations((-977.8365, 0)):
            Rectangle(F0_W, F0_H_2)
        with Locations((-1140.80925, 0)):
            Rectangle(F0_W, F0_H_2)
        with Locations((-1303.782, 0)):
            Rectangle(F0_W, F0_H_2)
    extrude(amount=-F5_DEPTH, mode=Mode.SUBTRACT)


with BuildPart() as f3:
    # F0 (on Top) → F3 (new body)
    with BuildSketch(Plane.XY):
        Polygon((-1441.45, 406.4), (-1441.45, 457.2), (-1492.25, 457.2), (-1492.25, -457.2), (-1441.45, -457.2), (-1441.45, -406.4), (-1441.45, -25.4), (-1441.45, 25.4), align=None)
    extrude(amount=-F3_DEPTH)


with BuildPart() as f3b:
    # F0 (on Top) → F3, piece 2 (new body)
    with BuildSketch(Plane.XY):
        Polygon((1492.25, -457.2), (1492.25, 457.2), (1441.45, 457.2), (1441.45, 406.4), (1441.45, 25.4), (1441.45, -25.4), (1441.45, -406.4), (1441.45, -457.2), align=None)
    extrude(amount=-F3_DEPTH)


with BuildPart() as f4:
    # F0 (on Top) → F4, piece 2 (new body)
    with BuildSketch(Plane.XY):
        Polygon((1441.45, 406.4), (1441.45, 457.2), (-1441.45, 457.2), (-1441.45, 406.4), (-1329.182, 406.4), (-1278.382, 406.4), (-1166.20925, 406.4), (-1115.40925, 406.4), (-1003.2365, 406.4), (-952.4365, 406.4), (-840.26375, 406.4), (-789.46375, 406.4), (-677.291, 406.4), (-626.491, 406.4), (-514.31825, 406.4), (-463.51825, 406.4), (-351.3455, 406.4), (-300.5455, 406.4), (-188.37275, 406.4), (-137.57275, 406.4), (-25.4, 406.4), (25.4, 406.4), (137.57275, 406.4), (188.37275, 406.4), (300.5455, 406.4), (351.3455, 406.4), (463.51825, 406.4), (514.31825, 406.4), (626.491, 406.4), (677.291, 406.4), (789.46375, 406.4), (840.26375, 406.4), (952.4365, 406.4), (1003.2365, 406.4), (1115.40925, 406.4), (1166.20925, 406.4), (1278.382, 406.4), (1329.182, 406.4), align=None)
    extrude(amount=-F4_DEPTH)


with BuildPart() as f4b:
    # F0 (on Top) → F4, piece 3 (new body)
    with BuildSketch(Plane.XY):
        Polygon((-1441.45, -457.2), (1441.45, -457.2), (1441.45, -406.4), (1329.182, -406.4), (1278.382, -406.4), (1166.20925, -406.4), (1115.40925, -406.4), (1003.2365, -406.4), (952.4365, -406.4), (840.26375, -406.4), (789.46375, -406.4), (677.291, -406.4), (626.491, -406.4), (514.31825, -406.4), (463.51825, -406.4), (351.3455, -406.4), (300.5455, -406.4), (188.37275, -406.4), (137.57275, -406.4), (25.4, -406.4), (-25.4, -406.4), (-137.57275, -406.4), (-188.37275, -406.4), (-300.5455, -406.4), (-351.3455, -406.4), (-463.51825, -406.4), (-514.31825, -406.4), (-626.491, -406.4), (-677.291, -406.4), (-789.46375, -406.4), (-840.26375, -406.4), (-952.4365, -406.4), (-1003.2365, -406.4), (-1115.40925, -406.4), (-1166.20925, -406.4), (-1278.382, -406.4), (-1329.182, -406.4), (-1441.45, -406.4), align=None)
    extrude(amount=-F4_DEPTH)


solid = Compound([f1.part, f1b.part, f1c.part, f1d.part, f1e.part, f1f.part, f1g.part, f1h.part, f1i.part, f1j.part, f1k.part, f1l.part, f1m.part, f1n.part, f1o.part, f1p.part, f1q.part, f2.part, f3.part, f3b.part, f4.part, f4b.part])
